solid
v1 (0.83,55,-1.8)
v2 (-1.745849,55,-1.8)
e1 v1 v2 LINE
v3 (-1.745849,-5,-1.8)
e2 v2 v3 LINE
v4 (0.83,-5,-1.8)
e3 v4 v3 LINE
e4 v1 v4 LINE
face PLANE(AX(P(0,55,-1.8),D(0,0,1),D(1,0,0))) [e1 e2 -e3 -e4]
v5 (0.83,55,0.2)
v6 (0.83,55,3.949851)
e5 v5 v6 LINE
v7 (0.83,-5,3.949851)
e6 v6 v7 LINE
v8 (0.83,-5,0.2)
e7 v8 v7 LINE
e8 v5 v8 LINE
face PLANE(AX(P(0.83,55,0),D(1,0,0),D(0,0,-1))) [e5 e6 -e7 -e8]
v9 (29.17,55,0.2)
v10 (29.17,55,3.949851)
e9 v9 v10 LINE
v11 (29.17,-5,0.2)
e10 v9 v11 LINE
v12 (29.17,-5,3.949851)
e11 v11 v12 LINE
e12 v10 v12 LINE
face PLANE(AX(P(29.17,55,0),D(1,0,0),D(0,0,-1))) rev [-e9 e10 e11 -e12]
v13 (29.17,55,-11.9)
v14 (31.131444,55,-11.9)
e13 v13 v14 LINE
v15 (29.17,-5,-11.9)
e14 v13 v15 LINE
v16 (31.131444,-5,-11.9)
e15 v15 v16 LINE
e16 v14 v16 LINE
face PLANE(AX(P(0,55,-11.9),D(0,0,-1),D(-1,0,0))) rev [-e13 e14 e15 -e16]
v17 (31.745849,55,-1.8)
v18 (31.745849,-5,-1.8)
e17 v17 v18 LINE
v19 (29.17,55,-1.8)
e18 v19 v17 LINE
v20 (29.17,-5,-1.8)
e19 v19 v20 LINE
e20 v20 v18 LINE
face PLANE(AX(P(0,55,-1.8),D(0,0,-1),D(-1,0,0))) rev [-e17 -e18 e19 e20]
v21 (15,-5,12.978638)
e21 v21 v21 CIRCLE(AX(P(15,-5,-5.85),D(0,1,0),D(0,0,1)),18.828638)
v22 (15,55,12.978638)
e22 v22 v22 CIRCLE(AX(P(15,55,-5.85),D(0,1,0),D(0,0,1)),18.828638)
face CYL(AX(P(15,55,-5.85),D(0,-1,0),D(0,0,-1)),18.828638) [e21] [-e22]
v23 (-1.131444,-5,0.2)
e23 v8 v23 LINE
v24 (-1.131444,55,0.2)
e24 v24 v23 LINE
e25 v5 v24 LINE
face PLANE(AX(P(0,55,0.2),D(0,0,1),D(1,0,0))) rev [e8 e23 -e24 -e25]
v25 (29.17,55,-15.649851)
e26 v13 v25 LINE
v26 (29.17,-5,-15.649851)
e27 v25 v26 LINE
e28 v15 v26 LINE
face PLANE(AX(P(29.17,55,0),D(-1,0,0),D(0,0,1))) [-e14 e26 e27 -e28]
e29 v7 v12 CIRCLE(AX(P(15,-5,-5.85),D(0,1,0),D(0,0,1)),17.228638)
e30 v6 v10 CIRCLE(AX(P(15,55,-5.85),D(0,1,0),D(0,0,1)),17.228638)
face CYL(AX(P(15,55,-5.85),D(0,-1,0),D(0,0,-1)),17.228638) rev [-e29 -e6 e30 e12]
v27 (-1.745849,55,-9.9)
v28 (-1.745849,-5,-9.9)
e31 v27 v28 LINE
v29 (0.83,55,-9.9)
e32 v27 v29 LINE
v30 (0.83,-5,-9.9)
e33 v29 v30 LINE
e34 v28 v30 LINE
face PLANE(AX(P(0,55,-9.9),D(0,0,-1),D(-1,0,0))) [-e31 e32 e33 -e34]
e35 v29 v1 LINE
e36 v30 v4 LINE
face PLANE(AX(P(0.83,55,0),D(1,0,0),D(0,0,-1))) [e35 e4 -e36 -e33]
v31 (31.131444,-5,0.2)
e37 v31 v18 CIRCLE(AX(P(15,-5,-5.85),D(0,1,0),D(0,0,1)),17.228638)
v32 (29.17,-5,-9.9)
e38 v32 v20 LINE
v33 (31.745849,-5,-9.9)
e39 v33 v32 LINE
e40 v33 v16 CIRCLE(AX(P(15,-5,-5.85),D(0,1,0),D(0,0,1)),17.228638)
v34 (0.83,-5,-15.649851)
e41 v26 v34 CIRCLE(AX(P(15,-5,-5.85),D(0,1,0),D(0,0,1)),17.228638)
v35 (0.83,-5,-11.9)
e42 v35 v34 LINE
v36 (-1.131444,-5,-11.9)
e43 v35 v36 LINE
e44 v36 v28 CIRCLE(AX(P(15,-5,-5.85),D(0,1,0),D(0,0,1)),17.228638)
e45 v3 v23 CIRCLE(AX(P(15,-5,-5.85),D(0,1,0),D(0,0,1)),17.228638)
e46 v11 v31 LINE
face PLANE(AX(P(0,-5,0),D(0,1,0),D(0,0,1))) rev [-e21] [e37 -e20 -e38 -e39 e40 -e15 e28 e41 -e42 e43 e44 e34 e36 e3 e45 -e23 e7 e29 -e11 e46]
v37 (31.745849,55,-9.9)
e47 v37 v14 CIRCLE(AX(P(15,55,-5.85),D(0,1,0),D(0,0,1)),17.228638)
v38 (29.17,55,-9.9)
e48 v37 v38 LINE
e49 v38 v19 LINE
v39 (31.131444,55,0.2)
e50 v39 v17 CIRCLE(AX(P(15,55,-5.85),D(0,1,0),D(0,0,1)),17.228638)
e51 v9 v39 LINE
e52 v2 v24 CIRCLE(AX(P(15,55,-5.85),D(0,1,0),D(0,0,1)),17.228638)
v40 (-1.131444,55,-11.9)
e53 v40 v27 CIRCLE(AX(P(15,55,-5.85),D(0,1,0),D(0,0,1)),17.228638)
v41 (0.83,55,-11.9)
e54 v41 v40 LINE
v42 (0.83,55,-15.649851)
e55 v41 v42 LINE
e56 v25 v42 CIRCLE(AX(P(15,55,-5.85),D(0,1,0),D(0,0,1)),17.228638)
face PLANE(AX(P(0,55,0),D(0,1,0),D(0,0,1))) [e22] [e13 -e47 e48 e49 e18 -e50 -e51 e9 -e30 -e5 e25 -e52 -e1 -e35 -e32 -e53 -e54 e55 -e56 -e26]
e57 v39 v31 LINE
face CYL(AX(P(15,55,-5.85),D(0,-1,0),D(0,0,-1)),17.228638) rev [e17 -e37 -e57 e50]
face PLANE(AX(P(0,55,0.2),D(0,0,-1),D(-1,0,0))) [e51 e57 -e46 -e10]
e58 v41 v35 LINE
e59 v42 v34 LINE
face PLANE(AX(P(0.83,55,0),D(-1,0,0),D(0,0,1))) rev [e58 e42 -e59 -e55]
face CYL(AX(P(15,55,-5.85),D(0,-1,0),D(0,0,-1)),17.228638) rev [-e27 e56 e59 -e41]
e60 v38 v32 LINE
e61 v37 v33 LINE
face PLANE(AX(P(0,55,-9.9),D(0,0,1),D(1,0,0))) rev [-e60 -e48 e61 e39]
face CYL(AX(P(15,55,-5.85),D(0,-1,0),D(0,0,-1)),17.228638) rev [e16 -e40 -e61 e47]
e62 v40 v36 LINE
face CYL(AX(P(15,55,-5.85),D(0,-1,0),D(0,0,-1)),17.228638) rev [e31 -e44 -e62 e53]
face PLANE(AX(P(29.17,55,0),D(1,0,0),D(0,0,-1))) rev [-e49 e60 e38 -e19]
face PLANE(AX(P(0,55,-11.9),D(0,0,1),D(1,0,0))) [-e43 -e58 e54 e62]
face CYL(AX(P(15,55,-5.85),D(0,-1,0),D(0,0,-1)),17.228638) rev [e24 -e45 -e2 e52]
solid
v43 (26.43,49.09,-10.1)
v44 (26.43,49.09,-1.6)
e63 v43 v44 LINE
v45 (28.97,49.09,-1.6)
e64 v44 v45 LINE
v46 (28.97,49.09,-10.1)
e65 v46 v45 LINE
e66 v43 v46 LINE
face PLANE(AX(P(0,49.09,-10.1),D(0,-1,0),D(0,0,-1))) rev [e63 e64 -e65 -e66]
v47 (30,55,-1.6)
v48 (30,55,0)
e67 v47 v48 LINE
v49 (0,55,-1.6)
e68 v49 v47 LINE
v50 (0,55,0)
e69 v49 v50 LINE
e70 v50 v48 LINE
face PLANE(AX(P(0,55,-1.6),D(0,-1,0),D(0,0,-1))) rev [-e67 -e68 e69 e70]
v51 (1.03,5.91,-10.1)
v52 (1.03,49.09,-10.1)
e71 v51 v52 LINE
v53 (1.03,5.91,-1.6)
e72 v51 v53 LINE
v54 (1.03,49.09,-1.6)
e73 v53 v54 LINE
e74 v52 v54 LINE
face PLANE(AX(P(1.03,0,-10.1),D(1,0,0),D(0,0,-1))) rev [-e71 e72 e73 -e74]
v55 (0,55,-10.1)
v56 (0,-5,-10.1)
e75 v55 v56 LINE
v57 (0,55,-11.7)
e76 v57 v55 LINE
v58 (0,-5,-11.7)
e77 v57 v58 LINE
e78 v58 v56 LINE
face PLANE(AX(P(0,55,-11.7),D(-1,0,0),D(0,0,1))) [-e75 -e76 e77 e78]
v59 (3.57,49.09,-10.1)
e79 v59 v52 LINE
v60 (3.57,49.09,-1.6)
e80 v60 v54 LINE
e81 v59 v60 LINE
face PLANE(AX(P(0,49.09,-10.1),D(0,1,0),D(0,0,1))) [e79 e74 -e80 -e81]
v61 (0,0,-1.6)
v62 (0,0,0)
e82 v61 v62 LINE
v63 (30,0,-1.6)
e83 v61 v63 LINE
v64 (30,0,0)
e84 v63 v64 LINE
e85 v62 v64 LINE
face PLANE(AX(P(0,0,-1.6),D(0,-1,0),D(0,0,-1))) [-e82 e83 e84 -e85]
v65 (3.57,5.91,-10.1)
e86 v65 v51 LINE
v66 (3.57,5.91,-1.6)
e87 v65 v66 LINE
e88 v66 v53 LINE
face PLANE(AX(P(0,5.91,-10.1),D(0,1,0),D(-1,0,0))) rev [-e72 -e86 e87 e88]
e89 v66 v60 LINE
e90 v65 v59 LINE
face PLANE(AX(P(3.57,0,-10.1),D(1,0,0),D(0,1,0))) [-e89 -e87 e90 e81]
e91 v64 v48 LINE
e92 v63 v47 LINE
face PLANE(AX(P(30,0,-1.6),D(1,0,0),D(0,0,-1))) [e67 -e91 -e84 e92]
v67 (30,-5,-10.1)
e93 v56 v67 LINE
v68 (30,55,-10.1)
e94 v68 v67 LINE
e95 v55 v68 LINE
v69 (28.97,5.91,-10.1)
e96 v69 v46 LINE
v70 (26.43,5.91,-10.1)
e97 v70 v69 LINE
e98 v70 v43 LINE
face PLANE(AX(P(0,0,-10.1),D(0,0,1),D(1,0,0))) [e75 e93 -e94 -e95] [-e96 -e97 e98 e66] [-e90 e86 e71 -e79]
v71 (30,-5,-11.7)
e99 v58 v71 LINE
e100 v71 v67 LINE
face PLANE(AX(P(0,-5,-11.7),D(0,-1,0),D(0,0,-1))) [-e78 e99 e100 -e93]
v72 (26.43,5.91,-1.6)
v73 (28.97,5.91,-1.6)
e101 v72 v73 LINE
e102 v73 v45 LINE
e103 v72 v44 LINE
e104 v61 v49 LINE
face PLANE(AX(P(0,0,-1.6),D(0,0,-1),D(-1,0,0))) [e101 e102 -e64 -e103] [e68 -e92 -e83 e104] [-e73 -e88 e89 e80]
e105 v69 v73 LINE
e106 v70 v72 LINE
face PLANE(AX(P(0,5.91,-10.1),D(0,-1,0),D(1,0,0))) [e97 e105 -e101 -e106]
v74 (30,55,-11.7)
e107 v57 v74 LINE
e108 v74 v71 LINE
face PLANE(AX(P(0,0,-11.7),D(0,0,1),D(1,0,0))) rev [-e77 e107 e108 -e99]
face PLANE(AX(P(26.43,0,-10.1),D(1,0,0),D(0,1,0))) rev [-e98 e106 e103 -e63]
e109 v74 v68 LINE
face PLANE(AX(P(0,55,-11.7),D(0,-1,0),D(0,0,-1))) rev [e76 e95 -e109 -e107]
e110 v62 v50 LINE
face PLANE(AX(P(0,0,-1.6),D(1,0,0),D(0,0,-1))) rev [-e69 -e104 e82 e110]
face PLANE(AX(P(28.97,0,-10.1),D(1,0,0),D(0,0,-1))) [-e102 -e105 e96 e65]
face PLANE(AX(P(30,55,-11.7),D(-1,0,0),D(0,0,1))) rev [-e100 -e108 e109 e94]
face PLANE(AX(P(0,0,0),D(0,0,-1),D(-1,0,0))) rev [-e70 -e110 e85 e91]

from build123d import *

# Parameters (mm, degrees)
OBC_2_W             = 30
OBC_2_H             = 55
OBC_DEPTH           = 1.6
HEADERS_START       = 5.91
HEADERS_OUTLINE_W   = 2.54
HEADERS_OUTLINE_H   = 8.5
HEADERS_DEPTH       = 43.18
RF_START            = -10.1
RF_2_W              = 30
RF_2_H              = 60
RF_DEPTH            = 1.6
BOSS_EXTRUDE4_START = -5
ENCLOSURE_R         = 18.828638124
ENCLOSURE_R_2       = 17.228638124
BOSS_EXTRUDE4_DEPTH = 60


# Read off the part's stored shape, not the designer's step: Headers
with BuildPart() as part:
    # OBC 2 → OBC (new body)
    with BuildSketch(Plane.XY):
        with Locations((15, 27.5)):
            Rectangle(OBC_2_W, OBC_2_H)
    extrude(amount=-OBC_DEPTH)

    # Headers outline → Headers (add)
    with BuildSketch(Plane(origin=(0, 0, 0), x_dir=(1, 0, 0), z_dir=(0, 1, 0)).offset(HEADERS_START)):
        with Locations((27.7, 5.85)):
            Rectangle(HEADERS_OUTLINE_W, HEADERS_OUTLINE_H)
        with Locations((2.3, 5.85)):
            Rectangle(HEADERS_OUTLINE_W, HEADERS_OUTLINE_H)
    extrude(amount=HEADERS_DEPTH)

    # RF 2 → RF (add)
    with BuildSketch(Plane.XY.offset(RF_START)):
        with Locations((15, 25)):
            Rectangle(RF_2_W, RF_2_H)
    extrude(amount=-RF_DEPTH)


with BuildPart() as body_2:
    # Enclosure → Boss-Extrude4 (new body)
    # profile 1 of 7: a face of its own
    with BuildSketch(Plane(origin=(0, 0, 0), x_dir=(1, 0, 0), z_dir=(0, 1, 0)).offset(BOSS_EXTRUDE4_START)):
        with Locations(Location((15, 5.85, 0), (0, 0, 270))):
            Circle(ENCLOSURE_R)
        with Locations((15, 5.85)):
            Circle(ENCLOSURE_R_2, mode=Mode.SUBTRACT)
    # profile 2 of 7: a face of its own
    with BuildSketch(Plane(origin=(0, 0, 0), x_dir=(1, 0, 0), z_dir=(0, 1, 0)).offset(BOSS_EXTRUDE4_START)):
        with BuildLine():
            ThreePointArc((0.83, 15.649850591), (-0.266293442, 13.835377647), (-1.131443569, 11.9))
            Line((-1.131443569, 11.9), (0.83, 11.9))
            Line((0.83, 11.9), (0.83, 15.649850591))
        make_face()
    # profile 3 of 7: a face of its own
    with BuildSketch(Plane(origin=(0, 0, 0), x_dir=(1, 0, 0), z_dir=(0, 1, 0)).offset(BOSS_EXTRUDE4_START)):
        with BuildLine():
            Line((0.83, 9.9), (-1.745849385, 9.9))
            ThreePointArc((-1.745849385, 9.9), (-2.228638124, 5.85), (-1.745849385, 1.8))
            Line((-1.745849385, 1.8), (0.83, 1.8))
            Line((0.83, 1.8), (0.83, 9.9))
        make_face()
    # profile 4 of 7: a face of its own
    with BuildSketch(Plane(origin=(0, 0, 0), x_dir=(1, 0, 0), z_dir=(0, 1, 0)).offset(BOSS_EXTRUDE4_START)):
        with BuildLine():
            Line((0.83, -0.2), (-1.131443569, -0.2))
            ThreePointArc((-1.131443569, -0.2), (-0.266293442, -2.135377647), (0.83, -3.949850591))
            Line((0.83, -3.949850591), (0.83, -0.2))
        make_face()
    # profile 5 of 7: a face of its own
    with BuildSketch(Plane(origin=(0, 0, 0), x_dir=(1, 0, 0), z_dir=(0, 1, 0)).offset(BOSS_EXTRUDE4_START)):
        with BuildLine():
            Line((29.17, -0.2), (29.17, -3.949850591))
            ThreePointArc((29.17, -3.949850591), (30.266293442, -2.135377647), (31.131443569, -0.2))
            Line((31.131443569, -0.2), (29.17, -0.2))
        make_face()
    # profile 6 of 7: a face of its own
    with BuildSketch(Plane(origin=(0, 0, 0), x_dir=(1, 0, 0), z_dir=(0, 1, 0)).offset(BOSS_EXTRUDE4_START)):
        with BuildLine():
            ThreePointArc((32.228638124, 5.85), (32.107515172, 7.889337206), (31.745849385, 9.9))
            Line((31.745849385, 9.9), (29.17, 9.9))
            Line((29.17, 9.9), (29.17, 1.8))
            Line((29.17, 1.8), (31.745849385, 1.8))
            ThreePointArc((31.745849385, 1.8), (32.107515172, 3.810662794), (32.228638124, 5.85))
        make_face()
    # profile 7 of 7: a face of its own
    with BuildSketch(Plane(origin=(0, 0, 0), x_dir=(1, 0, 0), z_dir=(0, 1, 0)).offset(BOSS_EXTRUDE4_START)):
        with BuildLine():
            ThreePointArc((31.131443569, 11.9), (30.266293442, 13.835377647), (29.17, 15.649850591))
            Line((29.17, 15.649850591), (29.17, 11.9))
            Line((29.17, 11.9), (31.131443569, 11.9))
        make_face()
    extrude(amount=BOSS_EXTRUDE4_DEPTH)


solid = Compound([part.part, body_2.part])
